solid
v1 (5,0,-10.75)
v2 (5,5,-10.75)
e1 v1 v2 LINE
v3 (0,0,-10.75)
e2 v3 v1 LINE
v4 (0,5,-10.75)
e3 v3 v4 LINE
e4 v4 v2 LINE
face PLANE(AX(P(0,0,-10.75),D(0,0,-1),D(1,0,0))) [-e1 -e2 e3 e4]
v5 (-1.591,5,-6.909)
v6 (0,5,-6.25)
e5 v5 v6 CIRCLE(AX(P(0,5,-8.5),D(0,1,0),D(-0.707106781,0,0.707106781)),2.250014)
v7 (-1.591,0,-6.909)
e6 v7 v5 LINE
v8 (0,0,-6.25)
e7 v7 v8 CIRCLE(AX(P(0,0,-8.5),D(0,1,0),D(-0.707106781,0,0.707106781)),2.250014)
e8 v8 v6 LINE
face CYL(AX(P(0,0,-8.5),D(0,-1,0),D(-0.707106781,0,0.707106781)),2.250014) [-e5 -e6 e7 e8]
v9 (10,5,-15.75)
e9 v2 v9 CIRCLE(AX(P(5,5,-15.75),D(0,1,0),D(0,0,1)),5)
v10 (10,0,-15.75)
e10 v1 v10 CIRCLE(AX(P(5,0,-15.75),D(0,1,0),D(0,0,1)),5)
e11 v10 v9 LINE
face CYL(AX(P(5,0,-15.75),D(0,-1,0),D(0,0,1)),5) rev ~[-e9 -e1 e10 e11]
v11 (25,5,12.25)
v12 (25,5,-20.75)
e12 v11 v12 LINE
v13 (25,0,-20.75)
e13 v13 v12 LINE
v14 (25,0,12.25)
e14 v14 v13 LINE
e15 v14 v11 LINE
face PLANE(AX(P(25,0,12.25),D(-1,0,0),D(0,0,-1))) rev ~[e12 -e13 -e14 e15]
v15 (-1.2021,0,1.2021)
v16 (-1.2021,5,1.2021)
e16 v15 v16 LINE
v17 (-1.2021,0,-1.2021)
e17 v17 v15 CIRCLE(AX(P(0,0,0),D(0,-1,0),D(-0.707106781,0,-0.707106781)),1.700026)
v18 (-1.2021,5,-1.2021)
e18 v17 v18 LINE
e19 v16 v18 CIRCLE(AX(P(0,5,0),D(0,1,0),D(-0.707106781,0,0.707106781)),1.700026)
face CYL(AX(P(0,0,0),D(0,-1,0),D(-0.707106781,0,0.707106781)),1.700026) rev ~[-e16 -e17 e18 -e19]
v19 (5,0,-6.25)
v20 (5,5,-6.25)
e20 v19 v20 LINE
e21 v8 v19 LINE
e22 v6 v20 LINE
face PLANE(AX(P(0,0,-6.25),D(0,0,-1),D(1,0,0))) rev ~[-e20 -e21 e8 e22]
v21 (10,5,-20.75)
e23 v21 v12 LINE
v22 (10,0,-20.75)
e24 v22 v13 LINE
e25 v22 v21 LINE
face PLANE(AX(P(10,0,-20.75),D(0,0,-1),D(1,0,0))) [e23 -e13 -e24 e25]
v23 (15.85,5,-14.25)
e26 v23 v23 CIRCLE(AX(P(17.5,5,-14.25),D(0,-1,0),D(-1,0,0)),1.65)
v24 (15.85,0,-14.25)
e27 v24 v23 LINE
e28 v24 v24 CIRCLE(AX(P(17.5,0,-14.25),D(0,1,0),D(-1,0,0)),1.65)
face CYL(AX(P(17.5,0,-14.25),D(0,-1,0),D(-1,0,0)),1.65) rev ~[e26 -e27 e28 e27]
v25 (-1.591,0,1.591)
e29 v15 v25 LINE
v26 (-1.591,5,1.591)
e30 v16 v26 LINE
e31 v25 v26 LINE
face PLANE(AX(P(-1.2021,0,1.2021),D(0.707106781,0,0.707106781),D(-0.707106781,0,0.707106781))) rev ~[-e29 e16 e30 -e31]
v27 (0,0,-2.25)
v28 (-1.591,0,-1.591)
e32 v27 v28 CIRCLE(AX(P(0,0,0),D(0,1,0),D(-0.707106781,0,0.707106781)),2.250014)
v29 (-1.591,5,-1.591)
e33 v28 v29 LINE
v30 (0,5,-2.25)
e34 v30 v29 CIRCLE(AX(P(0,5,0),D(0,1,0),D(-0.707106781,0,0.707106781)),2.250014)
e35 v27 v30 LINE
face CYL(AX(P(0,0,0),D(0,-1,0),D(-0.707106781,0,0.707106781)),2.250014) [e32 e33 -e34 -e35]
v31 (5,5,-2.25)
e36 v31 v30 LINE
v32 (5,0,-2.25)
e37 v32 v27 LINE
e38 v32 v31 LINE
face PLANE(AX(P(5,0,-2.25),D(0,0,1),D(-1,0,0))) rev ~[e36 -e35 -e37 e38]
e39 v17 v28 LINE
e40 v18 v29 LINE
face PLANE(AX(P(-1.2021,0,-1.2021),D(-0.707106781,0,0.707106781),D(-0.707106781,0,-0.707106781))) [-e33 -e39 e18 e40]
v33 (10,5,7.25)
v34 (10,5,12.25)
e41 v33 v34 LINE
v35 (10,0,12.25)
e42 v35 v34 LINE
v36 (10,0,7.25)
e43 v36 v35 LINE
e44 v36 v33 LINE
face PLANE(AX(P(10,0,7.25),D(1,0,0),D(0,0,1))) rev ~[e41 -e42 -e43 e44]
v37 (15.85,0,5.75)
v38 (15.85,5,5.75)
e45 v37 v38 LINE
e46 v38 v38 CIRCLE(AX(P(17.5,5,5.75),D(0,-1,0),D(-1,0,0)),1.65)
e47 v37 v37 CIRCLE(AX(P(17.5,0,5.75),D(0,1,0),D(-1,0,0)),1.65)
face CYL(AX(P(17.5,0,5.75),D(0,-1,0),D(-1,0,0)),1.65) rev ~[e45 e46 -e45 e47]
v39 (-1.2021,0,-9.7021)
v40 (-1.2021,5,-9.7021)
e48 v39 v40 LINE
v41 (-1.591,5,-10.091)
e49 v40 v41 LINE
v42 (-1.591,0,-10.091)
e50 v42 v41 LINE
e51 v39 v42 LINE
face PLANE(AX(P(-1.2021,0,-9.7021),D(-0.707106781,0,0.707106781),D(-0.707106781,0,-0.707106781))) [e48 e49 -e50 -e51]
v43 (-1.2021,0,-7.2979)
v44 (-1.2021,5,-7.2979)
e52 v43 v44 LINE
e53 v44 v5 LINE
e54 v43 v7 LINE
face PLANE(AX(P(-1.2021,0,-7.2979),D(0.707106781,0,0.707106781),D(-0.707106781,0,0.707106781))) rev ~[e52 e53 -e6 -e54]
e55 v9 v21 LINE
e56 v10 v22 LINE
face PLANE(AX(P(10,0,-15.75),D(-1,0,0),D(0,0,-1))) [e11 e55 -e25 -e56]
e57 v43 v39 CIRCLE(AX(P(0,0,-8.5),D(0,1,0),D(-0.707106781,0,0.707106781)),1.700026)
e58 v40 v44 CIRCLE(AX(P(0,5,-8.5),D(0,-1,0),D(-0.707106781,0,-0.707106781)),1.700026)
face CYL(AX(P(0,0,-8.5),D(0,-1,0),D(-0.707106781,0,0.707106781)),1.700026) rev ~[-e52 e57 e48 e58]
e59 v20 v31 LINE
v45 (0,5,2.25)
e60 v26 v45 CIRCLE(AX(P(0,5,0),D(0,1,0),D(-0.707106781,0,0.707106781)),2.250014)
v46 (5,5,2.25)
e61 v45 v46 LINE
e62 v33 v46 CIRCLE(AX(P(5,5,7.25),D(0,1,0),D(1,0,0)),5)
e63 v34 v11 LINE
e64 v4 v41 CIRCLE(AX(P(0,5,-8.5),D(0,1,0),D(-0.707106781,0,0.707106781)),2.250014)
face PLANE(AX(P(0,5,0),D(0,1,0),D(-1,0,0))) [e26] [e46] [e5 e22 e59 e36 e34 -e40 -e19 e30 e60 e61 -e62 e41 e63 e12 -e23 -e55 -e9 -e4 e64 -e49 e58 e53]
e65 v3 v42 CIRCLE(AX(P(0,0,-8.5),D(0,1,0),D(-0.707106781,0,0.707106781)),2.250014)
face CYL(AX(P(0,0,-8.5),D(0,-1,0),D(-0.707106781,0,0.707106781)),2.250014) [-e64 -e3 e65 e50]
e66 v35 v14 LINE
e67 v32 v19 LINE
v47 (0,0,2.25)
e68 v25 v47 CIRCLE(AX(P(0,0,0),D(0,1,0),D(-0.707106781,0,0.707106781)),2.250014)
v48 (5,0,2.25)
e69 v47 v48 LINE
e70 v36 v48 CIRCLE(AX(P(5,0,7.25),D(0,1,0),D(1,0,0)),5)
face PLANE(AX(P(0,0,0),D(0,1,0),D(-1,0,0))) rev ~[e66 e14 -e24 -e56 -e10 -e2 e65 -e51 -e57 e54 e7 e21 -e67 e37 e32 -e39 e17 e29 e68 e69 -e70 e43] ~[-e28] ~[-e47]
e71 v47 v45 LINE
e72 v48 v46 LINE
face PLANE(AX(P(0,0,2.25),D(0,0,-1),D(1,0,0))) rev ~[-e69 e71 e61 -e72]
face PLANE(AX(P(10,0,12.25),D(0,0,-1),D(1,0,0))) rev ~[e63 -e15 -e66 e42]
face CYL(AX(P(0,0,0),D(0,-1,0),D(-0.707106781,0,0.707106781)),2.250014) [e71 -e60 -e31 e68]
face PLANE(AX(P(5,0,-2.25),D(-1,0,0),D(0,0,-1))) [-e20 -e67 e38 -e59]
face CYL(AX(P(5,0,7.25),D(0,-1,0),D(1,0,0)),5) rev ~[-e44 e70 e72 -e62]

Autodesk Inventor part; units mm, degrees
ref_plane "YZ Plane" through (0, 0, 0) normal (1, 0, 0) x (0, 1, 0)
ref_plane "XZ Plane" through (0, 0, 0) normal (0, 1, 0) x (-1, 0, 0)
ref_plane "XY Plane" through (0, 0, 0) normal (0, 0, 1) x (1, 0, 0)
sketch "Sketch1" plane through (0, 0, 0) normal (0, 1, 0) x (-1, 0, 0)
  arc A0 (1.2021, 1.2021) -> (1.2021, -1.2021) centre (0, 0) ccw
  arc A1 (1.591, 1.591) -> (1.591, -1.591) centre (0, 0) ccw
  line L0 (0, 2.25) -> (0, 1.7)
  line L1 (0, -1.7) -> (0, -2.25)
  line L2 (0, 0) -> (1.2021, -1.2021)
  line L3 (0, 0) -> (1.7, 0) construction
  line L4 (0, 0) -> (1.2021, 1.2021)
  line L5 (1.2021, -1.2021) -> (1.591, -1.591)
  line L6 (1.2021, 1.2021) -> (1.591, 1.591)
  line L7 (0, 2.25) -> (-5, 2.25)
  line L8 (-5, 2.25) -> (-5, -2.25)
  line L9 (-5, -2.25) -> (0, -2.25)
  line L10 (0, 0) -> (0, -8.5)
  arc A2 (1.2021, -7.2979) -> (1.2021, -9.7021) centre (0, -8.5) ccw
  arc A3 (1.591, -6.909) -> (1.591, -10.091) centre (0, -8.5) ccw
  line L11 (0, -8.5) -> (1.2021, -9.7021)
  line L12 (0, -8.5) -> (1.7, -8.5) construction
  line L13 (0, -8.5) -> (1.2021, -7.2979)
  line L14 (0, -8.5) -> (1.7, -8.5) construction
  line L15 (1.2021, -9.7021) -> (1.591, -10.091)
  line L16 (1.2021, -7.2979) -> (1.591, -6.909)
  line L17 (0, -6.25) -> (-5, -6.25)
  line L18 (0, -10.75) -> (-5, -10.75)
  line L19 (-5, -10.75) -> (-5, -6.25)
  line L20 (-5, -2.25) -> (-5, -6.25)
  line L21 (0, -2.25) -> (-5, -2.25)
  line L22 (-5, -2.25) -> (-5, -6.25)
  line L23 (-5, -6.25) -> (0, -6.25)
  line L24 (0, -6.25) -> (0, -2.25)
  arc A4 (-10, 7.25) -> (-5, 2.25) centre (-5, 7.25) ccw
  arc A5 (-5, -10.75) -> (-10, -15.75) centre (-5, -15.75) ccw
  line L25 (-10, -15.75) -> (-10, -20.75)
  line L26 (-10, 7.25) -> (-10, 12.25)
  line L27 (-10, -20.75) -> (-25, -20.75)
  line L28 (-10, 12.25) -> (-25, 12.25)
  line L29 (-25, 12.25) -> (-25, -20.75)
  line L30 (-5, -4.25) -> (-17.5, -4.25)
  line L31 (-17.5, -4.25) -> (-17.5, -14.25)
  line L32 (-17.5, -4.25) -> (-17.5, 5.75)
  circle A6 centre (-17.5, 5.75) radius 1.65
  circle A7 centre (-17.5, -14.25) radius 1.65
  dimension "d0" = 3.4
  dimension "d1" = 4.5
  dimension "d2" = 45
  dimension "d5" = 5
  dimension "d6" = 8.5
  dimension "d7" = 3.4
  dimension "d8" = 4.5
  dimension "d9" = 45
  dimension "d10" = 45
  dimension "d15" = 5
  dimension "d16" = 5
  dimension "d17" = 15
  dimension "d18" = 15
  dimension "d19" = 10
  dimension "d20" = 10
  dimension "d21" = 3.3
  dimension "d22" = 3.3
extrude "Extrusion3" add sketch "Sketch1" along normal blind 5 contours A0 L0 A1 L6 | A0 L1 A1 L0 | A0 L5 A1 L1 | A1 L9 L8 L7 | L8 L20 L19 A5 L25 L27 L29 L28 L26 A4 | A3 L16 A2 L10 | L10 A2 L15 A3 | A3 L18 L19 L17
properties part number "headphonesclip"
